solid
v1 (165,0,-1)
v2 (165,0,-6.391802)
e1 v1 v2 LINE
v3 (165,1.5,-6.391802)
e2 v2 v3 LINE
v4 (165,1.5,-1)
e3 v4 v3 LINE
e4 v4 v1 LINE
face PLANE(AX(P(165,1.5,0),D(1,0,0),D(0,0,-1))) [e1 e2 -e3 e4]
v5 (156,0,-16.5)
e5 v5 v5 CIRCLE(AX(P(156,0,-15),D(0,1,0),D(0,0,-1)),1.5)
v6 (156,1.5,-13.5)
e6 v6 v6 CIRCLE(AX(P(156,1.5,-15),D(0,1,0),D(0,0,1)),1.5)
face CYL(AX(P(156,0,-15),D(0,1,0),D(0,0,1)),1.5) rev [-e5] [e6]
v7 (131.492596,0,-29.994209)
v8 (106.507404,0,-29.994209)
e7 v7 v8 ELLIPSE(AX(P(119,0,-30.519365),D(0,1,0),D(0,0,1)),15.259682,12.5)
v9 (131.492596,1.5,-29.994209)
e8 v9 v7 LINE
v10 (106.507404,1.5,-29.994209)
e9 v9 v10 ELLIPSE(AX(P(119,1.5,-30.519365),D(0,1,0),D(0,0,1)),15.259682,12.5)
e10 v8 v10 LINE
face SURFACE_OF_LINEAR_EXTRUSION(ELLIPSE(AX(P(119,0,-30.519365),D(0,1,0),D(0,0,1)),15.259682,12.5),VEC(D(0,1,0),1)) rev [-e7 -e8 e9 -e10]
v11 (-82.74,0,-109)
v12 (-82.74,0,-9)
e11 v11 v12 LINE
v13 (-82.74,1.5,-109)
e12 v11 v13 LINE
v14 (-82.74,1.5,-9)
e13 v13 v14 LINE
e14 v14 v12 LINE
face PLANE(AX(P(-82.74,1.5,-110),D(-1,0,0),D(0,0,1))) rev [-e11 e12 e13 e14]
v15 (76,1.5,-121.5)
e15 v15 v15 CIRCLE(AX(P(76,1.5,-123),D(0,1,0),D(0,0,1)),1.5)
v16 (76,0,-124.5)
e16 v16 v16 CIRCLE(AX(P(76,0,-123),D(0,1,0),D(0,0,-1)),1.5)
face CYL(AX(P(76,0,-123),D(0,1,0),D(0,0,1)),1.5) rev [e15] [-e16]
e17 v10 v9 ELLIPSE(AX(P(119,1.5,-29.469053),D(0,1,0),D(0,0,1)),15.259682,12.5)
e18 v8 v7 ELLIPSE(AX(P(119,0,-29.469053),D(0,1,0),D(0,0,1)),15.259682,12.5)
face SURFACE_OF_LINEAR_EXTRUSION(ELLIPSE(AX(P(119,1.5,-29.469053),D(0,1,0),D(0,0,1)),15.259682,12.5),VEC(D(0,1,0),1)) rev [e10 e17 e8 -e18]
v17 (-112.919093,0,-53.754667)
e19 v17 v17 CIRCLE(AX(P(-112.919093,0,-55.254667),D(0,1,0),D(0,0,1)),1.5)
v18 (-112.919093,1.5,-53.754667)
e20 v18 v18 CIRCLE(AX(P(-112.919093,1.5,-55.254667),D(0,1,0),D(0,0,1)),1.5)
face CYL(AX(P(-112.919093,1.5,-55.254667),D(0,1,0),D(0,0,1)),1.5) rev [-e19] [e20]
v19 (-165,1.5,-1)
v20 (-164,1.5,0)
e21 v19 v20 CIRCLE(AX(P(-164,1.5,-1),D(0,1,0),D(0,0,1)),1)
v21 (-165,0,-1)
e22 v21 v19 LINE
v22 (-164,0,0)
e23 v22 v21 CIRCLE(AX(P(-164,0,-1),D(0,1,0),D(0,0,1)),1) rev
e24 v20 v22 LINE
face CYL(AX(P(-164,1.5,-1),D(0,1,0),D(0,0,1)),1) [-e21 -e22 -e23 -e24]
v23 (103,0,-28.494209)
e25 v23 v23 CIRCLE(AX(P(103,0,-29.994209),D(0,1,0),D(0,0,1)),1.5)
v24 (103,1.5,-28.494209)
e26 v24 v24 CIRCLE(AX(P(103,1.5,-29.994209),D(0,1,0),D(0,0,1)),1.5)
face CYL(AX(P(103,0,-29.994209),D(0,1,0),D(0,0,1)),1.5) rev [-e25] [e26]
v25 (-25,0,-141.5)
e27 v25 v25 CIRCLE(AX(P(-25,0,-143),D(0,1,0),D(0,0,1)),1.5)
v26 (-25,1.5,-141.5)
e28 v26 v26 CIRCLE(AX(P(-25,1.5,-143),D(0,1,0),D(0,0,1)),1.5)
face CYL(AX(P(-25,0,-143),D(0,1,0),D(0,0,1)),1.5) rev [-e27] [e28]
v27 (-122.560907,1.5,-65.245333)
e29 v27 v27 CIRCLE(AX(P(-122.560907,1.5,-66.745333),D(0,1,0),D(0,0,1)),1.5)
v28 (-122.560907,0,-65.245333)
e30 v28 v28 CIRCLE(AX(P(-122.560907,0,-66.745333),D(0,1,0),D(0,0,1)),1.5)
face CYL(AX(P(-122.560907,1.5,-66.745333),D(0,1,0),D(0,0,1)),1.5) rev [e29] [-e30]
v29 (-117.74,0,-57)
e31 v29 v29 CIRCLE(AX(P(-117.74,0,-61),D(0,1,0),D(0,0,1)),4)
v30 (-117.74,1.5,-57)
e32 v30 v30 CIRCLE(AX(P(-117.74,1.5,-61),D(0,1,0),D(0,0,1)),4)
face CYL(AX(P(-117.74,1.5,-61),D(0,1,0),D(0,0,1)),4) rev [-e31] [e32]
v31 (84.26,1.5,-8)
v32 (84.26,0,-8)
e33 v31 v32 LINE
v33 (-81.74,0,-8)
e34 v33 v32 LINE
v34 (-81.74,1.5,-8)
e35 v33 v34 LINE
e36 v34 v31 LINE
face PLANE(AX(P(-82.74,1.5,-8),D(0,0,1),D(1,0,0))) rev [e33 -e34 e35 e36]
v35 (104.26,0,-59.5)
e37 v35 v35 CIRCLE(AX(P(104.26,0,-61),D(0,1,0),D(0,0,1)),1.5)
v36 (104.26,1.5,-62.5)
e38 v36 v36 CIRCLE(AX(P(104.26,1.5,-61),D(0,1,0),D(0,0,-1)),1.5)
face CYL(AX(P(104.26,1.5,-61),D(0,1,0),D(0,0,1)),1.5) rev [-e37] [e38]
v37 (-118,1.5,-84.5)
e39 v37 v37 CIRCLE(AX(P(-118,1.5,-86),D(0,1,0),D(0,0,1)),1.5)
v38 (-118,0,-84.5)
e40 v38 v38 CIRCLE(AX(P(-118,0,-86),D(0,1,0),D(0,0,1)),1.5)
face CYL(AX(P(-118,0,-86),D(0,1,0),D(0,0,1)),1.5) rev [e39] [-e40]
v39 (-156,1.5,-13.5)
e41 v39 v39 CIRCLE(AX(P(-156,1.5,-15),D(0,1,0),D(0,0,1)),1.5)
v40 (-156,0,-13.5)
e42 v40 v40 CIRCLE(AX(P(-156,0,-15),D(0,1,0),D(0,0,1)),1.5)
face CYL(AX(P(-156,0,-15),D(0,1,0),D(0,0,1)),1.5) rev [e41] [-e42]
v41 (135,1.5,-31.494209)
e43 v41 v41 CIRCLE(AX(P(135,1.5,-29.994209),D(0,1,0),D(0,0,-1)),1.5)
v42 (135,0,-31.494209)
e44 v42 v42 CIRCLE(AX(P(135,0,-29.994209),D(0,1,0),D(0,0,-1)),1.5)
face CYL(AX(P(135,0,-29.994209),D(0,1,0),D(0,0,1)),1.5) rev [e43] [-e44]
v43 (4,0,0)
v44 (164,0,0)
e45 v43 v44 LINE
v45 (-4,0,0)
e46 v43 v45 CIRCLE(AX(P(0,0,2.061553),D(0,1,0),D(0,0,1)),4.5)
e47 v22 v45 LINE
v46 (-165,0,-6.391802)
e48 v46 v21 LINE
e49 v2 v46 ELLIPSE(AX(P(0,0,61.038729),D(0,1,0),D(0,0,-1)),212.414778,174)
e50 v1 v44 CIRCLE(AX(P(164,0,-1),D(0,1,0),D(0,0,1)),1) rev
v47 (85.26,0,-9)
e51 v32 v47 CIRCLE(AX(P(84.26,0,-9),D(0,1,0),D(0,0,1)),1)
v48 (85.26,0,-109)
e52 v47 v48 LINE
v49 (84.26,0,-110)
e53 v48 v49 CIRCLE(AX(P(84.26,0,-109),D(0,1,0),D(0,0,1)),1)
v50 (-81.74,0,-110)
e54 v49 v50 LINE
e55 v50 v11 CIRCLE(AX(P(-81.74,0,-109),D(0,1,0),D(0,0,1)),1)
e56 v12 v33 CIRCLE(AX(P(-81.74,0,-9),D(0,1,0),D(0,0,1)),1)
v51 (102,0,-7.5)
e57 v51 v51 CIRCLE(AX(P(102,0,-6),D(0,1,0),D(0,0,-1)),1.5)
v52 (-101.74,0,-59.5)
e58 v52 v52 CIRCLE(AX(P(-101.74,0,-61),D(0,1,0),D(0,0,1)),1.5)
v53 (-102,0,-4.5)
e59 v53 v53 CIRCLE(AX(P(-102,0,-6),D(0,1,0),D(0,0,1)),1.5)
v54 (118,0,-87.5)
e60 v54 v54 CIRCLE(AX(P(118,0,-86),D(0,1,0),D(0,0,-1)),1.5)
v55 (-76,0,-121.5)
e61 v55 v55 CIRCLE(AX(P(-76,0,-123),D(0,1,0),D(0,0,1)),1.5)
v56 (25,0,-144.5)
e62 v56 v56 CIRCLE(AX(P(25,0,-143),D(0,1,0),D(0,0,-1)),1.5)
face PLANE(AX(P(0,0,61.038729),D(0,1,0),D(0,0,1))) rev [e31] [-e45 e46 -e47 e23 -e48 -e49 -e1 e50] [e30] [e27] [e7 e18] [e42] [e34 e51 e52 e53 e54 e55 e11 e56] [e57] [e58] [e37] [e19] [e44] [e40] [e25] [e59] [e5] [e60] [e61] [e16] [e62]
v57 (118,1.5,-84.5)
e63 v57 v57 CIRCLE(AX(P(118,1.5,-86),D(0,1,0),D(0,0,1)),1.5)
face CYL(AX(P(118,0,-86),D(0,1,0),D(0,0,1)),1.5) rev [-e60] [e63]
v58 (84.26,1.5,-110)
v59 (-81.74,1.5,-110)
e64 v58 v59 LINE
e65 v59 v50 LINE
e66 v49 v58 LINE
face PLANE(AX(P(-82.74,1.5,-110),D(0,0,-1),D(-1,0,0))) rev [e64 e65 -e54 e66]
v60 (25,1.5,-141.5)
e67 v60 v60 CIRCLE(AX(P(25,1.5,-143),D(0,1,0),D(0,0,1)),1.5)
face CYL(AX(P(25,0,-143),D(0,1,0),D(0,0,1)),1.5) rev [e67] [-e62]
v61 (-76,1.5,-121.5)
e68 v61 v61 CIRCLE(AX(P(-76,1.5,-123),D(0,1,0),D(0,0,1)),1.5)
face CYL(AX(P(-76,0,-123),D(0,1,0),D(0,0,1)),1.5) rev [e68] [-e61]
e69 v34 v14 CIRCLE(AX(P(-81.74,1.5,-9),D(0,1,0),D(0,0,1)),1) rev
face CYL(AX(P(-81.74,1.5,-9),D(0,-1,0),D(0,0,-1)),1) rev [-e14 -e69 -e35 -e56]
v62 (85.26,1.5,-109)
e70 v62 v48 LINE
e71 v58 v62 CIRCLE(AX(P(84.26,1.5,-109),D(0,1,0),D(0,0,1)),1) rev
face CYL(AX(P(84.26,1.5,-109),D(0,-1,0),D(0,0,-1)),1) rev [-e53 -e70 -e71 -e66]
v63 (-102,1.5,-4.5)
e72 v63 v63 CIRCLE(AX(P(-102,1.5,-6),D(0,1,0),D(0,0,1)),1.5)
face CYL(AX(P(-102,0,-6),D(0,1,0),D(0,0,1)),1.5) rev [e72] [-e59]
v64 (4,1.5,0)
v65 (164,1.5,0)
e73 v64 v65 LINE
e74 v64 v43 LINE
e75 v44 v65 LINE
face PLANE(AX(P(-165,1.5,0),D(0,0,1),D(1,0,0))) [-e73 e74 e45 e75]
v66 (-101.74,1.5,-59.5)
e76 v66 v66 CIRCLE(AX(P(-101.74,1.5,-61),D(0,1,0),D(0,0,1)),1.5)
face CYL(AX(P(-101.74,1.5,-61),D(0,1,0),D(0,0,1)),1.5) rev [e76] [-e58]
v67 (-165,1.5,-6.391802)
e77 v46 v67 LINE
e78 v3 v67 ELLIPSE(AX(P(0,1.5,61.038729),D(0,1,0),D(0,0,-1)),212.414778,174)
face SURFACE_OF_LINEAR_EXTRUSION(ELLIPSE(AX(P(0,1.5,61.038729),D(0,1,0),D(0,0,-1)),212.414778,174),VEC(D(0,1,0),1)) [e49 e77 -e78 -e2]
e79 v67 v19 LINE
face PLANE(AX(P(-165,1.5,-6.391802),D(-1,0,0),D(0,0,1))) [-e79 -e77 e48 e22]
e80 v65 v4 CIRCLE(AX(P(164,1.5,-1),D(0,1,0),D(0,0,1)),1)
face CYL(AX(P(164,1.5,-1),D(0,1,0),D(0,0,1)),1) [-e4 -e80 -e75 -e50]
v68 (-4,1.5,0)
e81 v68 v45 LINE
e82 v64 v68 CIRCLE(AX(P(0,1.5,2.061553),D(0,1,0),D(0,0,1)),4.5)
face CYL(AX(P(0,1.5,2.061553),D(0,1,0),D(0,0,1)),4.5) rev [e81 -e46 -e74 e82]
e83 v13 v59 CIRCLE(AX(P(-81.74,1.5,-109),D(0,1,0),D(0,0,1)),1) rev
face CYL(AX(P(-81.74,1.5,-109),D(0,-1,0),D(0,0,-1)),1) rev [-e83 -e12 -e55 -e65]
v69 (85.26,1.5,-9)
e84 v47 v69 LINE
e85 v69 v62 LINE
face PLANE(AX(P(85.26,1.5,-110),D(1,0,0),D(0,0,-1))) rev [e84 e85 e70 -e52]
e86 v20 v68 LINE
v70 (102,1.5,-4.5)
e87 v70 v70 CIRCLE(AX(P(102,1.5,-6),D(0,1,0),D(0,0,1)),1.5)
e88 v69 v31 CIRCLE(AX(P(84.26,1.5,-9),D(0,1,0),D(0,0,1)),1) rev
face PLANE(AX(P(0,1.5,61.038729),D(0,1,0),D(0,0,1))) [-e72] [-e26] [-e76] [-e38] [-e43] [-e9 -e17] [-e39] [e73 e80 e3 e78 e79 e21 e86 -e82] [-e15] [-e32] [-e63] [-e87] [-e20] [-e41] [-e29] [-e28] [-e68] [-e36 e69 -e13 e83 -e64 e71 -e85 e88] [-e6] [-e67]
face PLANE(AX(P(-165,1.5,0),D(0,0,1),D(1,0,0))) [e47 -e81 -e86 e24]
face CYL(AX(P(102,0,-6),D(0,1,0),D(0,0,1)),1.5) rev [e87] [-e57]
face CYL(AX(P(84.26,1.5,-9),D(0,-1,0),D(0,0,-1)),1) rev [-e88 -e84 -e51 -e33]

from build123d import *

# Parameters (mm, degrees)
BOSS_EXTRU_1_DEPTH      = 1.5
ESQUISSE4_R             = 4
ESQUISSE4_R_2           = 1.5
ESQUISSE4_W             = 168
ESQUISSE4_H             = 102
ENL_V_MAT_EXTRU_3_DEPTH = 3
ENL_V_MAT_EXTRU_4_DEPTH = 1.5
ESQUISSE11_R            = 1.5
ENL_V_MAT_EXTRU_5_DEPTH = 1.5
CONG_1_R                = 1
ESQUISSE12_R            = 1.5
ENL_V_MAT_EXTRU_6_DEPTH = 224.924001117


# Read off the part's stored shape, not the designer's step: Enlèv. mat.-Extru.4
with BuildPart() as part:
    # Esquisse1 → Boss.-Extru.1 (new body)
    with BuildSketch(Plane(origin=(0, 0, 0), x_dir=(1, 0, 0), z_dir=(0, 1, 0))):
        with BuildLine():
            Line((-165, 6.391802297), (-165, 0))
            Line((-165, 0), (165, 0))
            Line((165, 0), (165, 6.391802297))
            add(Edge.make_bspline(
                [(165, 6.391802297), (0, 608.094924715), (-165, 6.391802297)],
                knots=[1.893832827, 1.893832827, 1.893832827, 4.38935248, 4.38935248, 4.38935248], degree=2, weights=[1, 0.317447459, 1]))
        make_face()
    extrude(amount=BOSS_EXTRU_1_DEPTH)

    # Esquisse4 → Enlèv. mat.-Extru.3 (cut)
    with BuildSketch(Plane(origin=(0, 1.5, 0), x_dir=(1, 0, 0), z_dir=(0, 1, 0))):
        with Locations(Location((-117.74, 61, 0), (0, 0, 270))):
            Circle(ESQUISSE4_R)
        with Locations(Location((-112.919092927, 55.254666677, 0), (0, 0, 270))):
            Circle(ESQUISSE4_R_2)
        with Locations(Location((-122.560907073, 66.745333323, 0), (0, 0, 270))):
            Circle(ESQUISSE4_R_2)
        with Locations(Location((-101.74, 61, 0), (0, 0, 270))):
            Circle(ESQUISSE4_R_2)
        with Locations(Location((104.26, 61, 0), (0, 0, 270))):
            Circle(ESQUISSE4_R_2)
        with Locations((1.26, 59)):
            Rectangle(ESQUISSE4_W, ESQUISSE4_H)
    extrude(amount=-ENL_V_MAT_EXTRU_3_DEPTH, mode=Mode.SUBTRACT)

    # Enlèv. mat.-Extru.4 outline → Enlèv. mat.-Extru.4 (cut)
    with BuildSketch(Plane(origin=(0, 0, 0), x_dir=(1, 0, 0), z_dir=(0, 1, 0))):
        with BuildLine():
            add(Edge.make_bspline(
                [(131.492595534, 29.994209065), (131.937846155, 45.779047079), (119, 45.779047079), (106.062153845, 45.779047079), (106.507404466, 29.994209065)],
                knots=[1.536374944, 1.536374944, 1.536374944, 3.141592654, 3.141592654, 4.746810363, 4.746810363, 4.746810363], degree=2, weights=[1, 0.694832863, 1, 0.694832863, 1]))
            add(Edge.make_bspline(
                [(106.507404466, 29.994209065), (106.062153845, 14.209371052), (119, 14.209371052), (131.937846155, 14.209371052), (131.492595534, 29.994209065)],
                knots=[4.677967597, 4.677967597, 4.677967597, 6.283185307, 6.283185307, 7.888403017, 7.888403017, 7.888403017], degree=2, weights=[1, 0.694832863, 1, 0.694832863, 1]))
        make_face()
    extrude(amount=ENL_V_MAT_EXTRU_4_DEPTH, mode=Mode.SUBTRACT)

    # Esquisse11 → Enlèv. mat.-Extru.5 (cut)
    with BuildSketch(Plane(origin=(0, 1.5, 0), x_dir=(1, 0, 0), z_dir=(0, 1, 0))):
        with Locations(Location((103, 29.994209065, 0), (0, 0, 270))):
            Circle(ESQUISSE11_R)
        with Locations(Location((135, 29.994209065, 0), (0, 0, 90))):
            Circle(ESQUISSE11_R)
    extrude(amount=-ENL_V_MAT_EXTRU_5_DEPTH, mode=Mode.SUBTRACT)

    # Congé1
    cong_1_edges = [part.edges().sort_by_distance(p)[0] for p in [
        (-82.74, 0.75, -110),
        (-82.74, 0.75, -8),
        (85.26, 0.75, -8),
        (85.26, 0.75, -110),
        (165, 0.75, 0),
        (-165, 0.75, 0),
    ]]
    fillet(cong_1_edges, radius=CONG_1_R)

    # Esquisse12 → Enlèv. mat.-Extru.6 (cut, through all)
    with BuildSketch(Plane(origin=(0, 1.5, 0), x_dir=(1, 0, 0), z_dir=(0, 1, 0))):
        with Locations(Location((-156, 15, 0), (0, 0, 270))):
            Circle(ESQUISSE12_R)
        with Locations(Location((-76, 123, 0), (0, 0, 270))):
            Circle(ESQUISSE12_R)
        with Locations(Location((-25, 143, 0), (0, 0, 270))):
            Circle(ESQUISSE12_R)
        with Locations(Location((25, 143, 0), (0, 0, 270))):
            Circle(ESQUISSE12_R)
        with Locations(Location((76, 123, 0), (0, 0, 270))):
            Circle(ESQUISSE12_R)
        with Locations(Location((156, 15, 0), (0, 0, 270))):
            Circle(ESQUISSE12_R)
        with Locations(Location((-102, 6, 0), (0, 0, 270))):
            Circle(ESQUISSE12_R)
        with Locations(Location((102, 6, 0), (0, 0, 270))):
            Circle(ESQUISSE12_R)
        with Locations(Location((-118, 86, 0), (0, 0, 270))):
            Circle(ESQUISSE12_R)
        with Locations(Location((118, 86, 0), (0, 0, 270))):
            Circle(ESQUISSE12_R)
        with BuildLine():
            Line((-4, 0), (4, 0))
            ThreePointArc((4, 0), (0, 2.438447187), (-4, 0))
        make_face()
    extrude(amount=-ENL_V_MAT_EXTRU_6_DEPTH, mode=Mode.SUBTRACT)


solid = part.part
